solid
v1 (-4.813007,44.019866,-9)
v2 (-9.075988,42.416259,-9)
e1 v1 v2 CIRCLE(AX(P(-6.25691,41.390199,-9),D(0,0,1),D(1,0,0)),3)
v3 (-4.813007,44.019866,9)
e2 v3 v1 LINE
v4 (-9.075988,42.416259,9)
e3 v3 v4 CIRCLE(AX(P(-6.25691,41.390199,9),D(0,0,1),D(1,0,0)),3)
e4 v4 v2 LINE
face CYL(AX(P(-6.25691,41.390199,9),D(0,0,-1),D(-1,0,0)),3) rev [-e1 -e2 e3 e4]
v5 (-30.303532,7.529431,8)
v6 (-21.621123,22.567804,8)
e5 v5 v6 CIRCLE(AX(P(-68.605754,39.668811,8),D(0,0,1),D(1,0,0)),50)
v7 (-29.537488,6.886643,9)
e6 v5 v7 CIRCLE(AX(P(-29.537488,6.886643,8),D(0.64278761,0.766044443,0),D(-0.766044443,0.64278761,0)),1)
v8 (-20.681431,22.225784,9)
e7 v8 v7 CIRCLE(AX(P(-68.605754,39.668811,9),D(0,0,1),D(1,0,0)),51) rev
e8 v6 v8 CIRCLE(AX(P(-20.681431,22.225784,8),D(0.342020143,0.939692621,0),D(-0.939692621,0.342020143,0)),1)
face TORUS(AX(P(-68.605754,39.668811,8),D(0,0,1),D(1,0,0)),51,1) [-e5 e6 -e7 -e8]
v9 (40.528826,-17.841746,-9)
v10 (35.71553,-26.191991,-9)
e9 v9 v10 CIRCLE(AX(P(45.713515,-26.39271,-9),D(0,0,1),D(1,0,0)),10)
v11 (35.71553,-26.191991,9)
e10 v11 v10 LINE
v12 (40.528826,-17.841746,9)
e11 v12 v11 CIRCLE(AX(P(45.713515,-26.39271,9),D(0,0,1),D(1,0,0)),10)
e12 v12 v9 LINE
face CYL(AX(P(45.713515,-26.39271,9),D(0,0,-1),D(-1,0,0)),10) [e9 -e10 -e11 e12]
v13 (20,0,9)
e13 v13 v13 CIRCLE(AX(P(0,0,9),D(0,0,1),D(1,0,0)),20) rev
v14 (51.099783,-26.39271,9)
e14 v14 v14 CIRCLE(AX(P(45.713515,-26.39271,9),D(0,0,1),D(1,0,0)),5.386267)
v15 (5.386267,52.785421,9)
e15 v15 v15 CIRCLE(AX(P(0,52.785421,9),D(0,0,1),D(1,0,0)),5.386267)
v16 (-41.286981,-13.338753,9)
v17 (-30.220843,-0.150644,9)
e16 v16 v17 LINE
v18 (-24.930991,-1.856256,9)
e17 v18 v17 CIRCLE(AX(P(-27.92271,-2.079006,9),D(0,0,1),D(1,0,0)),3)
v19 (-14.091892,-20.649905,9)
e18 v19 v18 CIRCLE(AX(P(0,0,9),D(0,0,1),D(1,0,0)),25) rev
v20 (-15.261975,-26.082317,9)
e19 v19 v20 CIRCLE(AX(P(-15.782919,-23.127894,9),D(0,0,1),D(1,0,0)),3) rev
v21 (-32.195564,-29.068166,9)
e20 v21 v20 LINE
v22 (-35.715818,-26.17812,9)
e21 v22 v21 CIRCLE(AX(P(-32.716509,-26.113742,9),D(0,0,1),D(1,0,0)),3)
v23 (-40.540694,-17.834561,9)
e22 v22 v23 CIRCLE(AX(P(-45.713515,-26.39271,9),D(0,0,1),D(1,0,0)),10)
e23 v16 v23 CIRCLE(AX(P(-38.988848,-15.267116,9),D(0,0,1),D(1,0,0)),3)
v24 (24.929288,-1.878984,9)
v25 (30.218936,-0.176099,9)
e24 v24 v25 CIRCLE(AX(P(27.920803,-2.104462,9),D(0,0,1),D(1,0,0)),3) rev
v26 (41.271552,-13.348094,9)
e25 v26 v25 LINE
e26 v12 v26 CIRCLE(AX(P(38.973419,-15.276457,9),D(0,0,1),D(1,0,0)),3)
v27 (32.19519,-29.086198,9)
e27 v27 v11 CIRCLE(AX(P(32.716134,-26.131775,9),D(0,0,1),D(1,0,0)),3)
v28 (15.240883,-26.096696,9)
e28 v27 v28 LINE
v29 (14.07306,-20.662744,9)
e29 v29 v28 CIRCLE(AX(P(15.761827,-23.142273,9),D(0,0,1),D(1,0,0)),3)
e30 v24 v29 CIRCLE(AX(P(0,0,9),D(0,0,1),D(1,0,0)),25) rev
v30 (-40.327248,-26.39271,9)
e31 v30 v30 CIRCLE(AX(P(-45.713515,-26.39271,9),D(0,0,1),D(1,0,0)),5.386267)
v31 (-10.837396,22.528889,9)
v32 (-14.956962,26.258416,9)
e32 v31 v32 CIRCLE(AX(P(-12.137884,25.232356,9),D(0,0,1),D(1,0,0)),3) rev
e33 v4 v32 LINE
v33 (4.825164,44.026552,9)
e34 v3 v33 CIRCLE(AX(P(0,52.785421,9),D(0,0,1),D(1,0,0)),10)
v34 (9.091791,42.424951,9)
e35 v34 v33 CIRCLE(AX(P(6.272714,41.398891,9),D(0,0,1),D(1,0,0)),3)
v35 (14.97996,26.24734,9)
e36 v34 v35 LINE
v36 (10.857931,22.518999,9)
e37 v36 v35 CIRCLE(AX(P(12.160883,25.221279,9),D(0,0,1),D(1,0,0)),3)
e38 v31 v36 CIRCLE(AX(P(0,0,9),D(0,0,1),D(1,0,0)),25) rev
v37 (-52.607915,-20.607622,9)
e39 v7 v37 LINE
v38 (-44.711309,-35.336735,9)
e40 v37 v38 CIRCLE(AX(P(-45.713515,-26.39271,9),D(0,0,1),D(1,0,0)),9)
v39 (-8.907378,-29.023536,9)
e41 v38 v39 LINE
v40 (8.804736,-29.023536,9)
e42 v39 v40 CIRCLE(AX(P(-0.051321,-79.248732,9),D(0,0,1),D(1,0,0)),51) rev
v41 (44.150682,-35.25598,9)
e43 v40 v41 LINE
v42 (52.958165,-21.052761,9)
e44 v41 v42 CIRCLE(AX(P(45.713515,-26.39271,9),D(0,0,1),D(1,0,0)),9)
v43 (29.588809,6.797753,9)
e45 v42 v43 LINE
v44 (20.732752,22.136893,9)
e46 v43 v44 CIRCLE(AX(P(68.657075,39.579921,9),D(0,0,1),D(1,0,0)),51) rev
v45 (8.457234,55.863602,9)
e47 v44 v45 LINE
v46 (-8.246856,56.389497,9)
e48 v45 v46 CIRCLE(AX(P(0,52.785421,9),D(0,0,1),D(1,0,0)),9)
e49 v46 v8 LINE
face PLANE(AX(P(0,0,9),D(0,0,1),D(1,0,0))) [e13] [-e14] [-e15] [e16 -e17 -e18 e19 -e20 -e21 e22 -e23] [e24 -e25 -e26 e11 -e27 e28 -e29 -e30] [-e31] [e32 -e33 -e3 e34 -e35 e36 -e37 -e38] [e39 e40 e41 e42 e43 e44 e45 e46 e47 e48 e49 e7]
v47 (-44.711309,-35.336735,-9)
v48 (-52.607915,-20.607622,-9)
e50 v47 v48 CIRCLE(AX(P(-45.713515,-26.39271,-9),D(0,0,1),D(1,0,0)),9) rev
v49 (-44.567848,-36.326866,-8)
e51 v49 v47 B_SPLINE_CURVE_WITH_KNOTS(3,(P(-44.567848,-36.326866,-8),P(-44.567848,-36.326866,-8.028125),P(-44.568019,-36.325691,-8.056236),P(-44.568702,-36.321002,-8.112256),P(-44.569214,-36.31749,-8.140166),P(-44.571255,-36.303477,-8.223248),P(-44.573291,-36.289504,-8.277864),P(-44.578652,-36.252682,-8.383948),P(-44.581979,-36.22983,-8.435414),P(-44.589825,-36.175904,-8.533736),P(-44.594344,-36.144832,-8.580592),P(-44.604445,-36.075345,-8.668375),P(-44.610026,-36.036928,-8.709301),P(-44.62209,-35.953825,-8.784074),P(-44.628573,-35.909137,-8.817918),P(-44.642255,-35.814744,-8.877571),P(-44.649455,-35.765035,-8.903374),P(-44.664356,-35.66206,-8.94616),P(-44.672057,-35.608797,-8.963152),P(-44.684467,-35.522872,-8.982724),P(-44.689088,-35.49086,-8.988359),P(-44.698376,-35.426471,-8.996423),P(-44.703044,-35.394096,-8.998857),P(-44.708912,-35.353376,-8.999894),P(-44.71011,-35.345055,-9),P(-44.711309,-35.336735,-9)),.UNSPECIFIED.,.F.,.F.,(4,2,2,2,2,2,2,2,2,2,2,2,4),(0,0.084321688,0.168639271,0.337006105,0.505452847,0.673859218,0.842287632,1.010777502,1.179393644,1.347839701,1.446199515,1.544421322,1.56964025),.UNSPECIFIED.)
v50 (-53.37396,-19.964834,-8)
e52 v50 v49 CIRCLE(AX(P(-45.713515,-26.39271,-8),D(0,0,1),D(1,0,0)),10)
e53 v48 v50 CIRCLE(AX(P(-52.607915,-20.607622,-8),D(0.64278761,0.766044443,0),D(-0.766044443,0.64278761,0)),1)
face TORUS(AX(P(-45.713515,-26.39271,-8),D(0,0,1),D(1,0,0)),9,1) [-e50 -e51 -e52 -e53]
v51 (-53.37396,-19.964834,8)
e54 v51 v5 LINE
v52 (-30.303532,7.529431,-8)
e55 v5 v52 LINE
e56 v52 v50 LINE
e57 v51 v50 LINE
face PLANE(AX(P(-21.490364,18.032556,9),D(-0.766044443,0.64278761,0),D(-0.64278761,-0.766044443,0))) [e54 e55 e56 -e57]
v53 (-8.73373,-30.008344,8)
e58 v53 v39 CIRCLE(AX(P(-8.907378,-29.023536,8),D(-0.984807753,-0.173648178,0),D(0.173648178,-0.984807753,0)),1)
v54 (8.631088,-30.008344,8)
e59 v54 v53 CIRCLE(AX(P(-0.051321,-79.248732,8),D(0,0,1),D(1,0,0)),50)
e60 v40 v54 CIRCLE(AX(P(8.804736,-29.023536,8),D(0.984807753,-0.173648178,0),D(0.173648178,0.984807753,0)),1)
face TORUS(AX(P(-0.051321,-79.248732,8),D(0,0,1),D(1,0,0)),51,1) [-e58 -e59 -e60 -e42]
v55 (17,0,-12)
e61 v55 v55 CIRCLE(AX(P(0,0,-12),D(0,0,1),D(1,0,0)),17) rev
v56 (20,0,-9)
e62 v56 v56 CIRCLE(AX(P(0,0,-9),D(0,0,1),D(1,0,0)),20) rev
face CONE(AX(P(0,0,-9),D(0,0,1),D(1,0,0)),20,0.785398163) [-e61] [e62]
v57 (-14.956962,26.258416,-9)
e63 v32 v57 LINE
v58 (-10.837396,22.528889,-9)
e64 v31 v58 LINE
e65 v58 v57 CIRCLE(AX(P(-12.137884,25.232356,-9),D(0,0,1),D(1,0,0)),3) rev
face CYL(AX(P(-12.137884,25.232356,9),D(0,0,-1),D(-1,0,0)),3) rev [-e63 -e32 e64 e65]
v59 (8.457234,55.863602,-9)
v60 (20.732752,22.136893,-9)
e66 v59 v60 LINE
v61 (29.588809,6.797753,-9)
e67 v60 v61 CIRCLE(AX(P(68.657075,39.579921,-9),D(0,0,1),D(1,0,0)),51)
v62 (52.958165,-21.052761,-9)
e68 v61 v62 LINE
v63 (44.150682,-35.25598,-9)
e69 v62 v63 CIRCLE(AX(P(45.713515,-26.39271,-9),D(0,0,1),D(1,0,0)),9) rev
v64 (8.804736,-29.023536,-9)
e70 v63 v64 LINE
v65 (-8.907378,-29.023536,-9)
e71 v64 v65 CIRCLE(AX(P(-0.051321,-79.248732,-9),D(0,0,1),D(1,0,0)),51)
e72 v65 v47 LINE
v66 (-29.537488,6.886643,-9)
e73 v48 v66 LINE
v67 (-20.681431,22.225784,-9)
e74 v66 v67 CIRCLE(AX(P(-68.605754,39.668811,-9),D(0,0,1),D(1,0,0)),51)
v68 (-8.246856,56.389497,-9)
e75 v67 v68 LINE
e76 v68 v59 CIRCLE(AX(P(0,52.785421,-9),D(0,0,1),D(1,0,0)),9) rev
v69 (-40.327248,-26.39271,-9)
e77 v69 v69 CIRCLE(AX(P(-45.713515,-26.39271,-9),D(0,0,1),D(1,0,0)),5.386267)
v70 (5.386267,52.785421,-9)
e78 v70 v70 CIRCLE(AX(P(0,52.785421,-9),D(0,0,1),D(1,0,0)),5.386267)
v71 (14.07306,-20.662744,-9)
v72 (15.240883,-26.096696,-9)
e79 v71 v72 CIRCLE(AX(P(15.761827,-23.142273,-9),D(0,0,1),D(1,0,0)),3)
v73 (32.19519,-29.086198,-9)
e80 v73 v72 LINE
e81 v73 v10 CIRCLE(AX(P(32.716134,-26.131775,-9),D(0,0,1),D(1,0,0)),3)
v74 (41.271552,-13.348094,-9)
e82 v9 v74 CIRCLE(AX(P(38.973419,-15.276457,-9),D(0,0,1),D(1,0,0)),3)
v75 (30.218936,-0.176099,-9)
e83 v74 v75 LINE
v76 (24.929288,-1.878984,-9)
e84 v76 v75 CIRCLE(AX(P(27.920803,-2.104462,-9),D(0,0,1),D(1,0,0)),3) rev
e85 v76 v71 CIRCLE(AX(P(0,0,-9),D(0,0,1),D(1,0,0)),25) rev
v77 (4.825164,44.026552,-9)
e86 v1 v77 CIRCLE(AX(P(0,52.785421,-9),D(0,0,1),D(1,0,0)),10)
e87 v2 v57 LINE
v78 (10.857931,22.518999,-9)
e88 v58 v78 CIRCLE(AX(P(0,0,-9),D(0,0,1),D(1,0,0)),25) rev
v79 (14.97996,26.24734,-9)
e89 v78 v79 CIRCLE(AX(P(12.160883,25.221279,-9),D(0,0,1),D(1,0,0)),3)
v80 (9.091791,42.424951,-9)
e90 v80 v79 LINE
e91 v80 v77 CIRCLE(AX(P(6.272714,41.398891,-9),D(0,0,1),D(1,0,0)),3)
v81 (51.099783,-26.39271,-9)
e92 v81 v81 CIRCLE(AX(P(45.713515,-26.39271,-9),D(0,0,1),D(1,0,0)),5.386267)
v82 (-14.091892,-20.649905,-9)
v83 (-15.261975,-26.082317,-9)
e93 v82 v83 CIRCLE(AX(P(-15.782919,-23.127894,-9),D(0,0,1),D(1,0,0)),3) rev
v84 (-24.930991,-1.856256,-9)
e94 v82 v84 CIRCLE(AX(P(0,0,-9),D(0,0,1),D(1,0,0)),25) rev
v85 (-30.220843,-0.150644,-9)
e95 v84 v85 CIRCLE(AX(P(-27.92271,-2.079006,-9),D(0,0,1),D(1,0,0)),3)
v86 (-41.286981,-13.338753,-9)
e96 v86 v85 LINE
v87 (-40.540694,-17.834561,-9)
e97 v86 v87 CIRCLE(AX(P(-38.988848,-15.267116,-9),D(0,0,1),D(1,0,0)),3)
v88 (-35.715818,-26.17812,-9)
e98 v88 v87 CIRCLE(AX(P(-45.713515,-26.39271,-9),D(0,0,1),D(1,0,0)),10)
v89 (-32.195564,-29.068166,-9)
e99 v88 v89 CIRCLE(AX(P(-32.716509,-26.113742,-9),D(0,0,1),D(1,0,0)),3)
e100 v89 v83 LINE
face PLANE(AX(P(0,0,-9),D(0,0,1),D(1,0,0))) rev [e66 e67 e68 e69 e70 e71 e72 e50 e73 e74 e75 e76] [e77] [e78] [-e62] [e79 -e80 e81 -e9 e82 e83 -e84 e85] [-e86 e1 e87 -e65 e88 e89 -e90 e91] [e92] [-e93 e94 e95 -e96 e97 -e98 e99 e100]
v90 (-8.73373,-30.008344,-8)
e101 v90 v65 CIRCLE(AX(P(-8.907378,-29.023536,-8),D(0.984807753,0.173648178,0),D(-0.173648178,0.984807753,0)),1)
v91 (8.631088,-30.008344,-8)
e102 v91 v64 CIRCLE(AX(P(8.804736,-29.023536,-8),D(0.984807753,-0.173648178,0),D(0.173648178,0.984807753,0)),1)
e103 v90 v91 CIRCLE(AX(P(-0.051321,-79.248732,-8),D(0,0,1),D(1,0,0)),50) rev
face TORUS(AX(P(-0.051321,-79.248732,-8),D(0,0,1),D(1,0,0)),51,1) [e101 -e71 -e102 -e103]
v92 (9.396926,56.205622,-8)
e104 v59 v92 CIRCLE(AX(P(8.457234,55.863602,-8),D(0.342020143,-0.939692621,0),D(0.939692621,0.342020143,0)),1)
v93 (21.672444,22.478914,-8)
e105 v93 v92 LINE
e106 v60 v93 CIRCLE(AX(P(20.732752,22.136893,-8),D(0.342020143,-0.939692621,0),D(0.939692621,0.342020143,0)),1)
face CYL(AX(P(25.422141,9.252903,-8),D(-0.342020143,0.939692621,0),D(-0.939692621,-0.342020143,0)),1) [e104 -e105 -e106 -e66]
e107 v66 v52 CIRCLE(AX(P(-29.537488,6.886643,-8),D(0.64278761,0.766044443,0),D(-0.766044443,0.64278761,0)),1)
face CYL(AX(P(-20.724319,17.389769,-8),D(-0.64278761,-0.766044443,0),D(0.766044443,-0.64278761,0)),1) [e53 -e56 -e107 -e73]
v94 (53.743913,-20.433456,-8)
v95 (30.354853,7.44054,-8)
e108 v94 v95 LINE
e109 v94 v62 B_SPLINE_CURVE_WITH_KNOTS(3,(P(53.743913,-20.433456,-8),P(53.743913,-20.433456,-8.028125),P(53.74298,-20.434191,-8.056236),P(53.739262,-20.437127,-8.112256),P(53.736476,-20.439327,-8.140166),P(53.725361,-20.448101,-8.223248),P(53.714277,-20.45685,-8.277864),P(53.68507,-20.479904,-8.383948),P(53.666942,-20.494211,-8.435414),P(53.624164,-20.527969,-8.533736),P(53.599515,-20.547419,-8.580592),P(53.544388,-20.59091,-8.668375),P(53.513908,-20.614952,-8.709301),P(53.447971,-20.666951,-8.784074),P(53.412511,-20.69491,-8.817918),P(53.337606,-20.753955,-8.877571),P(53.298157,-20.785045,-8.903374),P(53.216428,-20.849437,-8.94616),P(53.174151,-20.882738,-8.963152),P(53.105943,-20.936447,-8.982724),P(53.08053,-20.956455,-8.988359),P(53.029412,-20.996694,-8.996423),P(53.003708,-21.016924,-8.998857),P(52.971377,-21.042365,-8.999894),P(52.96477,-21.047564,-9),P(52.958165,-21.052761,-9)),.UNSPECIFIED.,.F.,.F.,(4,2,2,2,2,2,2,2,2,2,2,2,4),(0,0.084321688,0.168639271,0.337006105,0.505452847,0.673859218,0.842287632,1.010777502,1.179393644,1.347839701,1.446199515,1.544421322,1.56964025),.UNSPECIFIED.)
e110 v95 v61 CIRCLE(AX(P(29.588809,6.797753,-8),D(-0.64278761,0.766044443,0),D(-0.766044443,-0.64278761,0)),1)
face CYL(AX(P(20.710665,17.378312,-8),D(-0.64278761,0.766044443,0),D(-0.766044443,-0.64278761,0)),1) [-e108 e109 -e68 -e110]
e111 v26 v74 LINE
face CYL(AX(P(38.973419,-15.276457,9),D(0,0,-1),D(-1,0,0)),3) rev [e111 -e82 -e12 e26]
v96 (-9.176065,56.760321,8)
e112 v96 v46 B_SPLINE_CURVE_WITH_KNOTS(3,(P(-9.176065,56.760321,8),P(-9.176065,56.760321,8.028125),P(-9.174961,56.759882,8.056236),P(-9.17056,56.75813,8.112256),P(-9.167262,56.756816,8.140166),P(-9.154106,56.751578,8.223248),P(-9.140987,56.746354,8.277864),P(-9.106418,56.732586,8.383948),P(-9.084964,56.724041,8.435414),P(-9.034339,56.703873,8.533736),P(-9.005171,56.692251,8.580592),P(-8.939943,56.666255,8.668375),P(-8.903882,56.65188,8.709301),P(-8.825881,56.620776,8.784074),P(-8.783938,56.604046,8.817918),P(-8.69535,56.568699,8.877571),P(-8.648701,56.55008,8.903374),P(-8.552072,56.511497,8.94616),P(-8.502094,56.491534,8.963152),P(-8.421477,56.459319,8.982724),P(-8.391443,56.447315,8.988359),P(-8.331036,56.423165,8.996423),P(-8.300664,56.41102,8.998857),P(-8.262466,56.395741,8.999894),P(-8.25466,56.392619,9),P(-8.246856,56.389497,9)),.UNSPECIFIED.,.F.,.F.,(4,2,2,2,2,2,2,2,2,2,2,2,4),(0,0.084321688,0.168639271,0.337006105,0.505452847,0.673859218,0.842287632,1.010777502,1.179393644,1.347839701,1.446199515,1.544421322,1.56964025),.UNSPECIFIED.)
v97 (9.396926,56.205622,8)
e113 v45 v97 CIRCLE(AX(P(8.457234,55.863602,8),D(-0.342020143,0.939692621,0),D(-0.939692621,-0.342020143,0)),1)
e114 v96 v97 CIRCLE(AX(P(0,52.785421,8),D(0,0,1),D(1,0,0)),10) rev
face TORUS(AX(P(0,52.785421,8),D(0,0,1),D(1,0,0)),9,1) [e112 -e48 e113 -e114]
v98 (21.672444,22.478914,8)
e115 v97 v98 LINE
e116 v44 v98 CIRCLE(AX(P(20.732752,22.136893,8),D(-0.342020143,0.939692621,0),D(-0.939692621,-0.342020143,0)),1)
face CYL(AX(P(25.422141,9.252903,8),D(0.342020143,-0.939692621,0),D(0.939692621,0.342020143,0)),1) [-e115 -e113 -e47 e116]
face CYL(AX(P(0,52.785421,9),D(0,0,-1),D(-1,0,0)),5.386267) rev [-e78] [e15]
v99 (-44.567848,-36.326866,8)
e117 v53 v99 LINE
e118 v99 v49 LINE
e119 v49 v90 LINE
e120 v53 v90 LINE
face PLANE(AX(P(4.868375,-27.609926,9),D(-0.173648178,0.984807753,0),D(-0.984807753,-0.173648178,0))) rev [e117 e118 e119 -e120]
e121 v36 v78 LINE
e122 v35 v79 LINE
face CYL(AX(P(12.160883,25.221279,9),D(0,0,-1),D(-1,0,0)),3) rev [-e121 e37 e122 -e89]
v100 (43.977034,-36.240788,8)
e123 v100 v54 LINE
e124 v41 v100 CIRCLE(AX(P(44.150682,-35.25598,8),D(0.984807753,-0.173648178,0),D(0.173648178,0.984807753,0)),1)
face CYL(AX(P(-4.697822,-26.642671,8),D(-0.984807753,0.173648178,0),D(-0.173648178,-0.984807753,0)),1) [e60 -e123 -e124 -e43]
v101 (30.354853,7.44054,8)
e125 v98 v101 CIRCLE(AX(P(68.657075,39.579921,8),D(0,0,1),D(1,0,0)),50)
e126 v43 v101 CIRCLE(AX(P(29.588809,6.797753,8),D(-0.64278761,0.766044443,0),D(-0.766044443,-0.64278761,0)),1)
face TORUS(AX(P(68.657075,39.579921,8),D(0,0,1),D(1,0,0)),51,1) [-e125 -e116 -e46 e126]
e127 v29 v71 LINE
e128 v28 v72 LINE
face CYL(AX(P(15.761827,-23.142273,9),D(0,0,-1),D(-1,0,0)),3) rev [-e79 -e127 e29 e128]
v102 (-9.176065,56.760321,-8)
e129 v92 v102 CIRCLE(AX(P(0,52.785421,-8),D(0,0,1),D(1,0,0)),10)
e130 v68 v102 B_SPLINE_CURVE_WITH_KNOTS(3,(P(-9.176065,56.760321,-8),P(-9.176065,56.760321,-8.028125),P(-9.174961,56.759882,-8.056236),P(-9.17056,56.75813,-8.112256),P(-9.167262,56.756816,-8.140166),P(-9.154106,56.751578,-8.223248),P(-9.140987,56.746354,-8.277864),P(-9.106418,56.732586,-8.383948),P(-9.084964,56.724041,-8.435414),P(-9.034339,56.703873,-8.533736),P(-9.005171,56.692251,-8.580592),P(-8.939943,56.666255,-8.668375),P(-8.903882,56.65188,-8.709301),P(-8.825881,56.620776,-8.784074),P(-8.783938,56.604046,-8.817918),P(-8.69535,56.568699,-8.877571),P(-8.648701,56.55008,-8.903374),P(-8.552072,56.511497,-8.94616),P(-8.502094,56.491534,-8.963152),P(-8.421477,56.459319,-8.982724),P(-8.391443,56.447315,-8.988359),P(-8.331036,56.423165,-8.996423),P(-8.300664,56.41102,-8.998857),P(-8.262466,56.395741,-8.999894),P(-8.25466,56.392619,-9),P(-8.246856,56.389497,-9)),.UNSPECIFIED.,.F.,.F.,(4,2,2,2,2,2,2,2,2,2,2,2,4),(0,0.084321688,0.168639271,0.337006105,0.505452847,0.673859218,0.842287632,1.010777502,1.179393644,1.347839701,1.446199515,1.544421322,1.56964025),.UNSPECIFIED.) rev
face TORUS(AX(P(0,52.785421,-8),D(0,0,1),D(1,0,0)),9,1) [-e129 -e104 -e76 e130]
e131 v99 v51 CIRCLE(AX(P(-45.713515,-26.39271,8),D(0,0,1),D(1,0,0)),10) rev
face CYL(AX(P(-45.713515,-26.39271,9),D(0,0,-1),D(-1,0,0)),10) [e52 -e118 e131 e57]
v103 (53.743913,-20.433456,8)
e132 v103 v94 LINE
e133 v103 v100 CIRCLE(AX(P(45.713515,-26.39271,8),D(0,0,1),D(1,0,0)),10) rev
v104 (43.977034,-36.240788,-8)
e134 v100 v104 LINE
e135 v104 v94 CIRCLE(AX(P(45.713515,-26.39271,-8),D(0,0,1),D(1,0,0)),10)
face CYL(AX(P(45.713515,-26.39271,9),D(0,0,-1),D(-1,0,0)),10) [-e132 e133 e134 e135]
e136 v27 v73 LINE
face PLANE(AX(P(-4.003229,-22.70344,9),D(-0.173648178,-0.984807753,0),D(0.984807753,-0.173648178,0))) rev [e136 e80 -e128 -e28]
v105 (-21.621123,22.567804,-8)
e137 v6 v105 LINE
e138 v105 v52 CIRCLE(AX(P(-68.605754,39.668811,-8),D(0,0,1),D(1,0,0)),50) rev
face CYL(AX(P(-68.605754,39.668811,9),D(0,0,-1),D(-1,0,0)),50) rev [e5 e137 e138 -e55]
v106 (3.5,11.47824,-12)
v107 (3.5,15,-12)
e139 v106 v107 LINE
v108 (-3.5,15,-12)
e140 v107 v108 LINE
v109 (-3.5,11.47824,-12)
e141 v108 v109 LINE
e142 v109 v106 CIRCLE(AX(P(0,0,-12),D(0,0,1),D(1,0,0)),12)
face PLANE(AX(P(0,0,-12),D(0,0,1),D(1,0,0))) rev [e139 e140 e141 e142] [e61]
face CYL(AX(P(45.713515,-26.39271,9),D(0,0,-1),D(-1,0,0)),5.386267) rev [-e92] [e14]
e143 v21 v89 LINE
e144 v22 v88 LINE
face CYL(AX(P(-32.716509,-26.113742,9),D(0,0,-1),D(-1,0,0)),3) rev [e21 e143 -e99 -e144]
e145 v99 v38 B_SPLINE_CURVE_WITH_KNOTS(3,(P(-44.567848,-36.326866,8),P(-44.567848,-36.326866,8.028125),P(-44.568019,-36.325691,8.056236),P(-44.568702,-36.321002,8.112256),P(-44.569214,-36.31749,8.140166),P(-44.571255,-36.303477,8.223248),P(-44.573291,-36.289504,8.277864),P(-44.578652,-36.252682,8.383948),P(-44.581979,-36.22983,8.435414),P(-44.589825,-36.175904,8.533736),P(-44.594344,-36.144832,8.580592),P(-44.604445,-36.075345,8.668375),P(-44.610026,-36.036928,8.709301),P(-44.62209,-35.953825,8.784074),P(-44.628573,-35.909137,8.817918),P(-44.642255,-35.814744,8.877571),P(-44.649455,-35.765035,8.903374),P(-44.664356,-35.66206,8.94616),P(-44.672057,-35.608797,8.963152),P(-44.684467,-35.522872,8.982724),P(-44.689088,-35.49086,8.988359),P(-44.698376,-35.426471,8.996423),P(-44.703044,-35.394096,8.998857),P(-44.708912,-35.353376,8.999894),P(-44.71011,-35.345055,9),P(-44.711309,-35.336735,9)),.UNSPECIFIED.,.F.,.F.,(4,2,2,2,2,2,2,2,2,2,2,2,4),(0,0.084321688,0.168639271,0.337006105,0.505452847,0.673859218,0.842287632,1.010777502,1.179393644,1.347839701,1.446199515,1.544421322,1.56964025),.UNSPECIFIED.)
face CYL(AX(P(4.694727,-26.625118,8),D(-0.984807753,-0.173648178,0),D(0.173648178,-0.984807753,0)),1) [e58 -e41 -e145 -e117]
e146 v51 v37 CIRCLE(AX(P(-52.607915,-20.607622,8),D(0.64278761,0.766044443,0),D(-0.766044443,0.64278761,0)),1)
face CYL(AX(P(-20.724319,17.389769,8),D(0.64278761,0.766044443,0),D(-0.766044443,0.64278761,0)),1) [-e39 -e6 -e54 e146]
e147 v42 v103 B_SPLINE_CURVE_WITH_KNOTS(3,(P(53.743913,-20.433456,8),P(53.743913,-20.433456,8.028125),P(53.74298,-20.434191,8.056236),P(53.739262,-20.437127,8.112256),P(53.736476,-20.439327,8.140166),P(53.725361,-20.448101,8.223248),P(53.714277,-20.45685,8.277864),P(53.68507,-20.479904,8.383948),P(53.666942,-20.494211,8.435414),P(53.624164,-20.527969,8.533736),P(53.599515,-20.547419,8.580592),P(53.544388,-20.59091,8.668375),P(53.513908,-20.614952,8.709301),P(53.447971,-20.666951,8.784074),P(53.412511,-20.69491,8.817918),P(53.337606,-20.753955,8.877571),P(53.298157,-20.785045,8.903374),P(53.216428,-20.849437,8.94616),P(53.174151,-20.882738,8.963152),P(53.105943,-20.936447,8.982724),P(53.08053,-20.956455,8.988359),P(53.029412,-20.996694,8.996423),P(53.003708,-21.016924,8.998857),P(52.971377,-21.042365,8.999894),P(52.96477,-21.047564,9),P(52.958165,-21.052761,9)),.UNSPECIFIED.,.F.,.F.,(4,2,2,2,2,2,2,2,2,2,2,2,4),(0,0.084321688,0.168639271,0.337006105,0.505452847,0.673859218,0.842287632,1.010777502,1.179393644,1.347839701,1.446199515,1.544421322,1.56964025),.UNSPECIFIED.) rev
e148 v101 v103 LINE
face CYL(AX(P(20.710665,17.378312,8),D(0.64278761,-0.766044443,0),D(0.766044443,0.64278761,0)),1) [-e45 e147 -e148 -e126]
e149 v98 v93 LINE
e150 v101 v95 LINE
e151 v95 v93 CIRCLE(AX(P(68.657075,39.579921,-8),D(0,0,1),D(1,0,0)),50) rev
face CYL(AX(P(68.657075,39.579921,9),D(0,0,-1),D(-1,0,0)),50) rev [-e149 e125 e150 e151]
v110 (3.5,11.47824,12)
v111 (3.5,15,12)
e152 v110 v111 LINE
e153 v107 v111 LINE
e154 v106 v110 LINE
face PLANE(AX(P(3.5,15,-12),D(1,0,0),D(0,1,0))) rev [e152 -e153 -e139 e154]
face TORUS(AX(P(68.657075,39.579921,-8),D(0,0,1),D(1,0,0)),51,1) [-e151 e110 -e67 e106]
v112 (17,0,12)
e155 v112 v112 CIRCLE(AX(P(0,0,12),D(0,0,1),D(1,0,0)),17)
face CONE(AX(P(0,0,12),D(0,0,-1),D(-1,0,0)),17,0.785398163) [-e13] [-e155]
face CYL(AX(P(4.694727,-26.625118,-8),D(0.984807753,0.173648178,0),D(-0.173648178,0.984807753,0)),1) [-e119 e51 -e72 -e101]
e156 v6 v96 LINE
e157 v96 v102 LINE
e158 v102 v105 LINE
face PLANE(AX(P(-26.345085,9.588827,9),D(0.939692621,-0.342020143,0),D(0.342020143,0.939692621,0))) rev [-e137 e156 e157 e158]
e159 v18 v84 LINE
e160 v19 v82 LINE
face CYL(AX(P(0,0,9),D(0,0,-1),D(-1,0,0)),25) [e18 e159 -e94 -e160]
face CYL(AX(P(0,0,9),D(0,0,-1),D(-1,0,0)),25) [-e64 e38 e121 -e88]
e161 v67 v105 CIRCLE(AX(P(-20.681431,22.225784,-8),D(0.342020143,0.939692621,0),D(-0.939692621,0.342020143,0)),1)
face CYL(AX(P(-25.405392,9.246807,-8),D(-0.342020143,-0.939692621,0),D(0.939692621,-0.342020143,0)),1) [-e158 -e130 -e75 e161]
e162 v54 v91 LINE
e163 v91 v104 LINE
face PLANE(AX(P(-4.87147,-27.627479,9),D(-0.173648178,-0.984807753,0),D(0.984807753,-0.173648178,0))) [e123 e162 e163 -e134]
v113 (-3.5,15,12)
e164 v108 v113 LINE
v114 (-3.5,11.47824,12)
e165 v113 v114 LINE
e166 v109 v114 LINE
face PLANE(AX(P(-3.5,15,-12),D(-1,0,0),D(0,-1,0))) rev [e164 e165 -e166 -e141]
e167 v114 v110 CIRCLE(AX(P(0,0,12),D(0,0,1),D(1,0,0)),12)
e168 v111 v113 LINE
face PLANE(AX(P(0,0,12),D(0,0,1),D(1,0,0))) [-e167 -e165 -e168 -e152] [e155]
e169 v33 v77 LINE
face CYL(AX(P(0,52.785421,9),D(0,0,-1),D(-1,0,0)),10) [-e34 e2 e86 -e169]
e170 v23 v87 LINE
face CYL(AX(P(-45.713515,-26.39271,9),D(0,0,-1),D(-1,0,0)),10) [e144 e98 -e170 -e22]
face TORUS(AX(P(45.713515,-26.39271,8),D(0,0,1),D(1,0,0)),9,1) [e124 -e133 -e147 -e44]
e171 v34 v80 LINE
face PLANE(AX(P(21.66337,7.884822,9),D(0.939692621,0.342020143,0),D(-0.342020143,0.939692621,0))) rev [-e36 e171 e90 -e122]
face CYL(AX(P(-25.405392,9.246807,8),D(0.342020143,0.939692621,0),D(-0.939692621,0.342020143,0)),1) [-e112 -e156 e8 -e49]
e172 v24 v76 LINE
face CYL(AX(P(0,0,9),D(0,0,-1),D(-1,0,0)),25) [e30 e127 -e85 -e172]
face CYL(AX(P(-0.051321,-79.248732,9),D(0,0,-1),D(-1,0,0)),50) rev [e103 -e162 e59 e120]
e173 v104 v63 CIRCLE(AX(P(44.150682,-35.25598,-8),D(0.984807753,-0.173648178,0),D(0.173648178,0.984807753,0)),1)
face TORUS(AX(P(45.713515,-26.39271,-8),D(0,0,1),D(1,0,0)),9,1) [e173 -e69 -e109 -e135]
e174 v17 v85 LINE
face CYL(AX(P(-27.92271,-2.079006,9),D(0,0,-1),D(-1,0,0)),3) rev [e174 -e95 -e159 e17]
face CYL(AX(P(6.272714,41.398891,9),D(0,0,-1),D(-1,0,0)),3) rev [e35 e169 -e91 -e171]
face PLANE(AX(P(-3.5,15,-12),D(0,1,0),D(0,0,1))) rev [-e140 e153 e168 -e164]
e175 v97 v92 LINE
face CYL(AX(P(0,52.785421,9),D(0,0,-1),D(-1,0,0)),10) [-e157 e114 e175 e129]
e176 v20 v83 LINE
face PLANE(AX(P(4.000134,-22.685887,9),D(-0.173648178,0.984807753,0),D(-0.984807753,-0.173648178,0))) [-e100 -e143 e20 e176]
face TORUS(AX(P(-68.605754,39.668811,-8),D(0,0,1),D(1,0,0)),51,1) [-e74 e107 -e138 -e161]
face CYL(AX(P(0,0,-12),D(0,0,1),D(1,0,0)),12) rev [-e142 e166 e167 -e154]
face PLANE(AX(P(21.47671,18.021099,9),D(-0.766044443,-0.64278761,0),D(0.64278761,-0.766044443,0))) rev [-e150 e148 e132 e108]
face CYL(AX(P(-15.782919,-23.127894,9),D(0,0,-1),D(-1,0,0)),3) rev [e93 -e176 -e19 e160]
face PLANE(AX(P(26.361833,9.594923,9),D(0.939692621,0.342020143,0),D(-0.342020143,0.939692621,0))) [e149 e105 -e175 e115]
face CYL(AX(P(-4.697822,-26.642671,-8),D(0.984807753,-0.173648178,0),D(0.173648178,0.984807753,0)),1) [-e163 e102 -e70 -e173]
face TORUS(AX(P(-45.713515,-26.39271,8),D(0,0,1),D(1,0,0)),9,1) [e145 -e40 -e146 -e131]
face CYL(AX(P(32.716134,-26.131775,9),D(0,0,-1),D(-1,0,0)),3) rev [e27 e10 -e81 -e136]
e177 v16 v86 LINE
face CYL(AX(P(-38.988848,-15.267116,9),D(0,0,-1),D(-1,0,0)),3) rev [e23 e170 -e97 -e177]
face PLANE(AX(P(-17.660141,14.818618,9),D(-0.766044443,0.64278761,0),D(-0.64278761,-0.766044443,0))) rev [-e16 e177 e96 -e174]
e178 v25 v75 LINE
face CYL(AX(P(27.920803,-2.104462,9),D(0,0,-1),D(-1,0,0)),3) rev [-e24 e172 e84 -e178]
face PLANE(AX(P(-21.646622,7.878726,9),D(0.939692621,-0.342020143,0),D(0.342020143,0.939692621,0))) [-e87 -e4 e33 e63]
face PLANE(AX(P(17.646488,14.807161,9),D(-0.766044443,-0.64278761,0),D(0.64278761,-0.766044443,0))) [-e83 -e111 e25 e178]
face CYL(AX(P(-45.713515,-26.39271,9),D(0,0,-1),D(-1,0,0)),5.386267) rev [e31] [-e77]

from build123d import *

# Parameters (mm, degrees)
SKETCH_1_R               = 5.386267440115599
SKETCH_1_R_2             = 5.386267440115426
SKETCH_1_R_3             = 20
SKETCH_1_R_4             = 5.3862674401151445
EXTRUDE_1_DEPTH          = 9
SKETCH_1_3_R             = 20
EXTRUDE_2_DEPTH          = 12
CUT_EXTRUDE_1_DEPTH      = 85.79389650309288
CUT_EXTRUDE_1_DEPTH_BACK = 85.79389650309288
CHAMFER_1_SIZE           = 3
FILLET_7_R               = 1
FILLET_9_R               = 1


# Some blends are built 0.0001 mm under size
with BuildPart() as part:
    # 스케치1 → 보스-돌출1 (new, symmetric)
    # profile 1 of 2: a face of its own
    with BuildSketch(Plane.XY):
        with BuildLine():
            ThreePointArc((-30.30353233995049, 7.529430557445876), (-25.30448430667716, 14.66881104177321), (-21.621123456603517, 22.56780387549022))
            Line((-21.621123456603517, 22.56780387549022), (-9.176064809943858, 56.760321490976835))
            ThreePointArc((-9.176064809943858, 56.760321490976835), (0.29852591934797246, 62.780964033722356), (9.396926207859103, 56.20562234639382))
            Line((9.396926207859103, 56.20562234639382), (21.67244430875402, 22.47891355207783))
            ThreePointArc((21.67244430875402, 22.47891355207783), (25.355805158827664, 14.579920718360814), (30.354853192101004, 7.440540234033471))
            Line((30.354853192101004, 7.440540234033471), (53.7439127431297, -20.433455513304605))
            ThreePointArc((53.7439127431297, -20.433455513304605), (54.22064676760672, -31.649013046704578), (43.97703368356183, -36.240787986690655))
            Line((43.97703368356183, -36.240787986690655), (8.631088031196274, -30.00834410952336))
            ThreePointArc((8.631088031196274, -30.00834410952336), (-0.0513208521507147, -29.248731760133694), (-8.733729735497715, -30.008344109523378))
            Line((-8.733729735497715, -30.008344109523378), (-44.56784793318583, -36.32686597767225))
            ThreePointArc((-44.56784793318583, -36.32686597767225), (-54.51917268695475, -31.131950987017753), (-53.37395989142093, -19.964834359703186))
            Line((-53.37395989142093, -19.964834359703186), (-30.30353233995049, 7.529430557445876))
        make_face()
        with Locations((-45.7135154602312, -26.392710456568583)):
            Circle(SKETCH_1_R, mode=Mode.SUBTRACT)
        with Locations((45.71351546023121, -26.392710456568555)):
            Circle(SKETCH_1_R_2, mode=Mode.SUBTRACT)
        Circle(SKETCH_1_R_3, mode=Mode.SUBTRACT)
        with Locations((0, 52.78542091313719)):
            Circle(SKETCH_1_R_4, mode=Mode.SUBTRACT)
        with BuildLine():
            ThreePointArc((-24.93099104661169, -1.856255756561672), (-27.002088749126838, 0.7762442533106575), (-30.22084330156199, -0.1506436182894203))
            Line((-30.22084330156199, -0.1506436182894203), (-41.28698133071818, -13.338753370678669))
            ThreePointArc((-41.28698133071818, -13.338753370678669), (-41.94835091243124, -15.758382440557112), (-40.54069433802355, -17.834561028237598))
            ThreePointArc((-40.54069433802355, -17.834561028237598), (-37.056732035085815, -21.386703991318203), (-35.71581818831214, -26.17811954561789))
            ThreePointArc((-35.71581818831214, -26.17811954561789), (-34.620101474352836, -28.43243494649932), (-32.19556447373562, -29.068165531369296))
            Line((-32.19556447373562, -29.068165531369296), (-15.261974751472668, -26.082316783086657))
            ThreePointArc((-15.261974751472668, -26.082316783086657), (-12.850176674158359, -23.759574441635834), (-14.091892218279895, -20.64990493218754))
            ThreePointArc((-14.091892218279895, -20.64990493218754), (-21.656330873683668, -12.49012942645256), (-24.93099104661169, -1.856255756561672))
        make_face(mode=Mode.SUBTRACT)
        with BuildLine():
            ThreePointArc((14.073060164409453, -20.662743709607216), (12.828797131654818, -23.77261693864109), (15.240882851137762, -26.096696213796697))
            Line((15.240882851137762, -26.096696213796697), (32.19518993918212, -29.086197992636468))
            ThreePointArc((32.19518993918212, -29.086197992636468), (34.6213349722887, -28.44914631675104), (35.71553008480945, -26.19199066966955))
            ThreePointArc((35.71553008480945, -26.19199066966955), (37.049794977242556, -21.39871932795785), (40.5288256439671, -17.841746095215687))
            ThreePointArc((40.5288256439671, -17.841746095215687), (41.93326169229327, -15.765669885135), (41.2715520284448, -13.34809395775018))
            Line((41.2715520284448, -13.34809395775018), (30.2189362994426, -0.1760994551487046))
            ThreePointArc((30.2189362994426, -0.1760994551487046), (27.001483386643283, 0.7512077778785407), (24.929288366147933, -1.8789841823288744))
            ThreePointArc((24.929288366147933, -1.8789841823288744), (21.644934816705337, -12.509867976144985), (14.073060164409453, -20.662743709607216))
        make_face(mode=Mode.SUBTRACT)
        with BuildLine():
            ThreePointArc((-4.813007455654948, 44.019865640833565), (-7.313160217940428, 44.19810483163431), (-9.075987554709165, 42.41625948911946))
            Line((-9.075987554709165, 42.41625948911946), (-14.95696154796992, 26.258416238235363))
            ThreePointArc((-14.95696154796992, 26.258416238235363), (-14.151306712484917, 23.008366663757286), (-10.837396147868024, 22.528889114516407))
            ThreePointArc((-10.837396147868024, 22.528889114516407), (0.01139605697825839, 24.999997402597582), (10.857930882202126, 22.51899946616905))
            ThreePointArc((10.857930882202126, 22.51899946616905), (14.17329161747192, 22.99637268533062), (14.979960450424109, 26.247339832086322))
            Line((14.979960450424109, 26.247339832086322), (9.091791391536077, 42.42495136331512))
            ThreePointArc((9.091791391536077, 42.42495136331512), (7.327015940142559, 44.20752875730815), (4.825164253214109, 44.02655169790714))
            ThreePointArc((4.825164253214109, 44.02655169790714), (0.00693705784330613, 42.785423319276056), (-4.813007455654948, 44.019865640833565))
        make_face(mode=Mode.SUBTRACT)
    # profile 2 of 2: a face of its own
    with BuildSketch(Plane.XY):
        Circle(SKETCH_1_R_3)
    extrude(amount=EXTRUDE_1_DEPTH, both=True)

    # 스케치1<3> → 보스-돌출2 (add, symmetric)
    with BuildSketch(Plane.XY):
        Circle(SKETCH_1_3_R)
    extrude(amount=EXTRUDE_2_DEPTH, both=True)

    # 스케치2 → 컷-돌출1 (cut, two sides: drawn at the far end of the back side and taken through both)
    with BuildSketch(Plane.XY.offset(-CUT_EXTRUDE_1_DEPTH_BACK)):
        with BuildLine():
            Line((-3.5000000000000018, 14.999999999999998), (3.4999999999999982, 14.999999999999998))
            Line((3.4999999999999982, 14.999999999999998), (3.4999999999999987, 11.478240283248999))
            ThreePointArc((3.4999999999999987, 11.478240283248999), (-2.2e-15, -12.000000000000004), (-3.5000000000000013, 11.478240283248999))
            Line((-3.5000000000000013, 11.478240283248999), (-3.5000000000000018, 14.999999999999998))
        make_face()
    extrude(amount=CUT_EXTRUDE_1_DEPTH + CUT_EXTRUDE_1_DEPTH_BACK, mode=Mode.SUBTRACT)

    # 모따기1
    chamfer_1_edges = [part.edges().sort_by_distance(p)[0] for p in [
        (-20, 2.45e-15, -12),
        (-20, 2.45e-15, 12),
    ]]
    chamfer(chamfer_1_edges, length=CHAMFER_1_SIZE - 0.0001)  # a hair under: the kernel refuses the full size

    # 필렛7
    # the kernel refuses this fillet: 1 mm, written as the material it takes off along each edge
    with BuildSketch(Plane(origin=(-21.621123456603517, 22.56780387549022, -9), x_dir=(0.9396926207859106, -0.34202014332566255, 0), z_dir=(0.34202014332566255, 0.9396926207859106, 0))) as fillet_7_piece_1:
        with BuildLine():
            CenterArc((FILLET_7_R, -FILLET_7_R), FILLET_7_R, 90, 90)
            Line((0, -FILLET_7_R), (-FILLET_7_R * 0.02, -FILLET_7_R))
            Line((-FILLET_7_R * 0.02, -FILLET_7_R), (-FILLET_7_R * 0.02, FILLET_7_R * 0.02))
            Line((-FILLET_7_R * 0.02, FILLET_7_R * 0.02), (FILLET_7_R, FILLET_7_R * 0.02))
            Line((FILLET_7_R, FILLET_7_R * 0.02), (FILLET_7_R, 0))
        make_face()
    extrude(amount=37.386917231391855, mode=Mode.SUBTRACT)
    with BuildSketch(Plane(origin=(8.9e-16, 52.78542091313719, -9), x_dir=(-0.952733181074785, 0.30380830416418975, 0), z_dir=(-0.30380830416418975, -0.952733181074785, 0))) as fillet_7_piece_2:
        with BuildLine():
            CenterArc((9.999999999999998 - FILLET_7_R, -FILLET_7_R), FILLET_7_R, 0, 90)
            Line((10, -FILLET_7_R), (9.999999999999998 + FILLET_7_R * 0.02, -FILLET_7_R))
            Line((9.999999999999998 + FILLET_7_R * 0.02, -FILLET_7_R), (9.999999999999998 + FILLET_7_R * 0.02, FILLET_7_R * 0.02))
            Line((9.999999999999998 + FILLET_7_R * 0.02, FILLET_7_R * 0.02), (9.999999999999998 - FILLET_7_R, FILLET_7_R * 0.02))
            Line((9.999999999999998 - FILLET_7_R, FILLET_7_R * 0.02), (9.999999999999998 - FILLET_7_R, 0))
        make_face()
    revolve(axis=Axis((8.9e-16, 52.78542091313719, -9), (0, 0, -1)), revolution_arc=142.31351700415118, mode=Mode.SUBTRACT)
    with BuildSketch(Plane(origin=(9.396926207859103, 56.20562234639382, -9), x_dir=(-0.9396926207859108, -0.3420201433256624, 0), z_dir=(0.3420201433256624, -0.9396926207859108, 0))) as fillet_7_piece_3:
        with BuildLine():
            CenterArc((FILLET_7_R, -FILLET_7_R), FILLET_7_R, 90, 90)
            Line((0, -FILLET_7_R), (-FILLET_7_R * 0.02, -FILLET_7_R))
            Line((-FILLET_7_R * 0.02, -FILLET_7_R), (-FILLET_7_R * 0.02, FILLET_7_R * 0.02))
            Line((-FILLET_7_R * 0.02, FILLET_7_R * 0.02), (FILLET_7_R, FILLET_7_R * 0.02))
            Line((FILLET_7_R, FILLET_7_R * 0.02), (FILLET_7_R, 0))
        make_face()
    extrude(amount=35.891213837678855, mode=Mode.SUBTRACT)
    with BuildSketch(Plane(origin=(68.65707534805, 39.57992071836101, -9), x_dir=(-0.9396926207859114, -0.3420201433256606, 0), z_dir=(-0.3420201433256606, 0.9396926207859114, 0))) as fillet_7_piece_4:
        with BuildLine():
            CenterArc((50.00000000000044 + FILLET_7_R, FILLET_7_R), FILLET_7_R, 180, 90)
            Line((50.00000000000044, FILLET_7_R), (50.00000000000044 - FILLET_7_R * 0.02, FILLET_7_R))
            Line((50.00000000000044 - FILLET_7_R * 0.02, FILLET_7_R), (50.00000000000044 - FILLET_7_R * 0.02, -FILLET_7_R * 0.02))
            Line((50.00000000000044 - FILLET_7_R * 0.02, -FILLET_7_R * 0.02), (50.00000000000044 + FILLET_7_R, -FILLET_7_R * 0.02))
            Line((50.00000000000044 + FILLET_7_R, -FILLET_7_R * 0.02), (50.00000000000044 + FILLET_7_R, 0))
        make_face()
    revolve(axis=Axis((68.65707534805, 39.57992071836101, -9), (0, 0, 1)), revolution_arc=20.000000000000934, mode=Mode.SUBTRACT)
    with BuildSketch(Plane(origin=(30.354853192101004, 7.440540234033471, -9), x_dir=(-0.7660444431189747, -0.6427876096865432, 0), z_dir=(0.6427876096865434, -0.7660444431189748, 0))) as fillet_7_piece_5:
        with BuildLine():
            CenterArc((FILLET_7_R, -FILLET_7_R), FILLET_7_R, 90, 90)
            Line((0, -FILLET_7_R), (-FILLET_7_R * 0.02, -FILLET_7_R))
            Line((-FILLET_7_R * 0.02, -FILLET_7_R), (-FILLET_7_R * 0.02, FILLET_7_R * 0.02))
            Line((-FILLET_7_R * 0.02, FILLET_7_R * 0.02), (FILLET_7_R, FILLET_7_R * 0.02))
            Line((FILLET_7_R, FILLET_7_R * 0.02), (FILLET_7_R, 0))
        make_face()
    extrude(amount=37.386917231392225, mode=Mode.SUBTRACT)
    with BuildSketch(Plane(origin=(45.71351546023114, -26.392710456568558, -9), x_dir=(0.7394722998242538, 0.673186985757025, 0), z_dir=(-0.673186985757025, 0.7394722998242538, 0))) as fillet_7_piece_6:
        with BuildLine():
            CenterArc((10.000000000000018 - FILLET_7_R, -FILLET_7_R), FILLET_7_R, 0, 90)
            Line((10.000000000000018, -FILLET_7_R), (10.000000000000018 + FILLET_7_R * 0.02, -FILLET_7_R))
            Line((10.000000000000018 + FILLET_7_R * 0.02, -FILLET_7_R), (10.000000000000018 + FILLET_7_R * 0.02, FILLET_7_R * 0.02))
            Line((10.000000000000018 + FILLET_7_R * 0.02, FILLET_7_R * 0.02), (10.000000000000018 - FILLET_7_R, FILLET_7_R * 0.02))
            Line((10.000000000000018 - FILLET_7_R, FILLET_7_R * 0.02), (10.000000000000018 - FILLET_7_R, 0))
        make_face()
    revolve(axis=Axis((45.71351546023114, -26.392710456568558, -9), (0, 0, -1)), revolution_arc=142.31351700415058, mode=Mode.SUBTRACT)
    with BuildSketch(Plane(origin=(43.97703368356183, -36.240787986690655, -9), x_dir=(0.17364817766693527, 0.9848077530122072, 0), z_dir=(-0.9848077530122072, 0.17364817766693527, 0))) as fillet_7_piece_7:
        with BuildLine():
            CenterArc((FILLET_7_R, -FILLET_7_R), FILLET_7_R, 90, 90)
            Line((0, -FILLET_7_R), (-FILLET_7_R * 0.02, -FILLET_7_R))
            Line((-FILLET_7_R * 0.02, -FILLET_7_R), (-FILLET_7_R * 0.02, FILLET_7_R * 0.02))
            Line((-FILLET_7_R * 0.02, FILLET_7_R * 0.02), (FILLET_7_R, FILLET_7_R * 0.02))
            Line((FILLET_7_R, FILLET_7_R * 0.02), (FILLET_7_R, 0))
        make_face()
    extrude(amount=35.89121383767927, mode=Mode.SUBTRACT)
    with BuildSketch(Plane(origin=(-0.05132085215066962, -79.24873176013405, -9), x_dir=(0.1736481776669377, 0.9848077530122067, 0), z_dir=(0.9848077530122067, -0.1736481776669377, 0))) as fillet_7_piece_8:
        with BuildLine():
            CenterArc((50.00000000000036 + FILLET_7_R, FILLET_7_R), FILLET_7_R, 180, 90)
            Line((50.00000000000036, FILLET_7_R), (50.00000000000036 - FILLET_7_R * 0.02, FILLET_7_R))
            Line((50.00000000000036 - FILLET_7_R * 0.02, FILLET_7_R), (50.00000000000036 - FILLET_7_R * 0.02, -FILLET_7_R * 0.02))
            Line((50.00000000000036 - FILLET_7_R * 0.02, -FILLET_7_R * 0.02), (50.00000000000036 + FILLET_7_R, -FILLET_7_R * 0.02))
            Line((50.00000000000036 + FILLET_7_R, -FILLET_7_R * 0.02), (50.00000000000036 + FILLET_7_R, 0))
        make_face()
    revolve(axis=Axis((-0.05132085215066962, -79.24873176013405, -9), (0, 0, 1)), revolution_arc=20.00000000000097, mode=Mode.SUBTRACT)
    with BuildSketch(Plane(origin=(-8.733729735497715, -30.008344109523378, -9), x_dir=(-0.17364817766693744, 0.9848077530122069, 0), z_dir=(-0.9848077530122069, -0.17364817766693744, 0))) as fillet_7_piece_9:
        with BuildLine():
            CenterArc((FILLET_7_R, -FILLET_7_R), FILLET_7_R, 90, 90)
            Line((0, -FILLET_7_R), (-FILLET_7_R * 0.02, -FILLET_7_R))
            Line((-FILLET_7_R * 0.02, -FILLET_7_R), (-FILLET_7_R * 0.02, FILLET_7_R * 0.02))
            Line((-FILLET_7_R * 0.02, FILLET_7_R * 0.02), (FILLET_7_R, FILLET_7_R * 0.02))
            Line((FILLET_7_R, FILLET_7_R * 0.02), (FILLET_7_R, 0))
        make_face()
    extrude(amount=37.38691723139181, mode=Mode.SUBTRACT)
    with BuildSketch(Plane(origin=(-45.713515460231235, -26.392710456568643, -9), x_dir=(0.21326088125054068, -0.9769952899212169, 0), z_dir=(0.9769952899212169, 0.21326088125054068, 0))) as fillet_7_piece_10:
        with BuildLine():
            CenterArc((9.999999999999979 - FILLET_7_R, -FILLET_7_R), FILLET_7_R, 0, 90)
            Line((9.999999999999973, -FILLET_7_R), (9.999999999999979 + FILLET_7_R * 0.02, -FILLET_7_R))
            Line((9.999999999999979 + FILLET_7_R * 0.02, -FILLET_7_R), (9.999999999999979 + FILLET_7_R * 0.02, FILLET_7_R * 0.02))
            Line((9.999999999999979 + FILLET_7_R * 0.02, FILLET_7_R * 0.02), (9.999999999999979 - FILLET_7_R, FILLET_7_R * 0.02))
            Line((9.999999999999979 - FILLET_7_R, FILLET_7_R * 0.02), (9.999999999999979 - FILLET_7_R, 0))
        make_face()
    revolve(axis=Axis((-45.713515460231235, -26.392710456568643, -9), (0, 0, -1)), revolution_arc=142.31351700415175, mode=Mode.SUBTRACT)
    with BuildSketch(Plane(origin=(-53.37395989142093, -19.964834359703186, -9), x_dir=(0.7660444431189748, -0.6427876096865431, 0), z_dir=(0.6427876096865432, 0.7660444431189749, 0))) as fillet_7_piece_11:
        with BuildLine():
            CenterArc((FILLET_7_R, -FILLET_7_R), FILLET_7_R, 90, 90)
            Line((0, -FILLET_7_R), (-FILLET_7_R * 0.02, -FILLET_7_R))
            Line((-FILLET_7_R * 0.02, -FILLET_7_R), (-FILLET_7_R * 0.02, FILLET_7_R * 0.02))
            Line((-FILLET_7_R * 0.02, FILLET_7_R * 0.02), (FILLET_7_R, FILLET_7_R * 0.02))
            Line((FILLET_7_R, FILLET_7_R * 0.02), (FILLET_7_R, 0))
        make_face()
    extrude(amount=35.89121383767928, mode=Mode.SUBTRACT)
    with BuildSketch(Plane(origin=(-68.60575449589972, 39.66881104177352, -9), x_dir=(0.766044443118974, -0.6427876096865442, 0), z_dir=(-0.6427876096865442, -0.766044443118974, 0))) as fillet_7_piece_12:
        with BuildLine():
            CenterArc((50.000000000000696 + FILLET_7_R, FILLET_7_R), FILLET_7_R, 180, 90)
            Line((50.000000000000696, FILLET_7_R), (50.000000000000696 - FILLET_7_R * 0.02, FILLET_7_R))
            Line((50.000000000000696 - FILLET_7_R * 0.02, FILLET_7_R), (50.000000000000696 - FILLET_7_R * 0.02, -FILLET_7_R * 0.02))
            Line((50.000000000000696 - FILLET_7_R * 0.02, -FILLET_7_R * 0.02), (50.000000000000696 + FILLET_7_R, -FILLET_7_R * 0.02))
            Line((50.000000000000696 + FILLET_7_R, -FILLET_7_R * 0.02), (50.000000000000696 + FILLET_7_R, 0))
        make_face()
    revolve(axis=Axis((-68.60575449589972, 39.66881104177352, -9), (0, 0, 1)), revolution_arc=20.00000000000081, mode=Mode.SUBTRACT)

    # 필렛9
    # the kernel refuses this fillet: 1 mm, written as the material it takes off along each edge
    with BuildSketch(Plane(origin=(-68.60575449589972, 39.66881104177352, 9), x_dir=(0.766044443118974, -0.6427876096865442, 0), z_dir=(-0.6427876096865442, -0.766044443118974, 0))) as fillet_9_piece_1:
        with BuildLine():
            CenterArc((50.000000000000696 + FILLET_9_R, -FILLET_9_R), FILLET_9_R, 90, 90)
            Line((50.000000000000696 + FILLET_9_R, 0), (50.000000000000696 + FILLET_9_R, FILLET_9_R * 0.02))
            Line((50.000000000000696 + FILLET_9_R, FILLET_9_R * 0.02), (50.000000000000696 - FILLET_9_R * 0.02, FILLET_9_R * 0.02))
            Line((50.000000000000696 - FILLET_9_R * 0.02, FILLET_9_R * 0.02), (50.000000000000696 - FILLET_9_R * 0.02, -FILLET_9_R))
            Line((50.000000000000696 - FILLET_9_R * 0.02, -FILLET_9_R), (50.000000000000696, -FILLET_9_R))
        make_face()
    revolve(axis=Axis((-68.60575449589972, 39.66881104177352, 9), (0, 0, 1)), revolution_arc=20.00000000000081, mode=Mode.SUBTRACT)
    with BuildSketch(Plane(origin=(-53.37395989142093, -19.964834359703186, 9), x_dir=(0, 0, -1), z_dir=(0.6427876096865432, 0.7660444431189749, 0))) as fillet_9_piece_2:
        with BuildLine():
            CenterArc((FILLET_9_R, -FILLET_9_R), FILLET_9_R, 90, 90)
            Line((0, -FILLET_9_R), (-FILLET_9_R * 0.02, -FILLET_9_R))
            Line((-FILLET_9_R * 0.02, -FILLET_9_R), (-FILLET_9_R * 0.02, FILLET_9_R * 0.02))
            Line((-FILLET_9_R * 0.02, FILLET_9_R * 0.02), (FILLET_9_R, FILLET_9_R * 0.02))
            Line((FILLET_9_R, FILLET_9_R * 0.02), (FILLET_9_R, 0))
        make_face()
    extrude(amount=35.89121383767928, mode=Mode.SUBTRACT)
    with BuildSketch(Plane(origin=(-45.713515460231235, -26.392710456568643, 9), x_dir=(0.21326088125054068, -0.9769952899212169, 0), z_dir=(0.9769952899212169, 0.21326088125054068, 0))) as fillet_9_piece_3:
        with BuildLine():
            CenterArc((9.999999999999979 - FILLET_9_R, FILLET_9_R), FILLET_9_R, 270.00000000000034, 89.99999999999966)
            Line((9.999999999999979 - FILLET_9_R, 0), (9.999999999999979 - FILLET_9_R, -FILLET_9_R * 0.02))
            Line((9.999999999999979 - FILLET_9_R, -FILLET_9_R * 0.02), (9.999999999999979 + FILLET_9_R * 0.02, -FILLET_9_R * 0.02))
            Line((9.999999999999979 + FILLET_9_R * 0.02, -FILLET_9_R * 0.02), (9.999999999999979 + FILLET_9_R * 0.02, FILLET_9_R))
            Line((9.999999999999979 + FILLET_9_R * 0.02, FILLET_9_R), (9.999999999999973, FILLET_9_R))
        make_face()
    revolve(axis=Axis((-45.713515460231235, -26.392710456568643, 9), (0, 0, -1)), revolution_arc=142.31351700415175, mode=Mode.SUBTRACT)
    with BuildSketch(Plane(origin=(-8.733729735497715, -30.008344109523378, 9), x_dir=(0, 0, -1), z_dir=(-0.9848077530122069, -0.17364817766693744, 0))) as fillet_9_piece_4:
        with BuildLine():
            CenterArc((FILLET_9_R, -FILLET_9_R), FILLET_9_R, 90, 90)
            Line((0, -FILLET_9_R), (-FILLET_9_R * 0.02, -FILLET_9_R))
            Line((-FILLET_9_R * 0.02, -FILLET_9_R), (-FILLET_9_R * 0.02, FILLET_9_R * 0.02))
            Line((-FILLET_9_R * 0.02, FILLET_9_R * 0.02), (FILLET_9_R, FILLET_9_R * 0.02))
            Line((FILLET_9_R, FILLET_9_R * 0.02), (FILLET_9_R, 0))
        make_face()
    extrude(amount=37.38691723139181, mode=Mode.SUBTRACT)
    with BuildSketch(Plane(origin=(-0.05132085215066962, -79.24873176013405, 9), x_dir=(0.1736481776669377, 0.9848077530122067, 0), z_dir=(0.9848077530122067, -0.1736481776669377, 0))) as fillet_9_piece_5:
        with BuildLine():
            CenterArc((50.00000000000036 + FILLET_9_R, -FILLET_9_R), FILLET_9_R, 90, 90)
            Line((50.00000000000036 + FILLET_9_R, 0), (50.00000000000036 + FILLET_9_R, FILLET_9_R * 0.02))
            Line((50.00000000000036 + FILLET_9_R, FILLET_9_R * 0.02), (50.00000000000036 - FILLET_9_R * 0.02, FILLET_9_R * 0.02))
            Line((50.00000000000036 - FILLET_9_R * 0.02, FILLET_9_R * 0.02), (50.00000000000036 - FILLET_9_R * 0.02, -FILLET_9_R))
            Line((50.00000000000036 - FILLET_9_R * 0.02, -FILLET_9_R), (50.00000000000036, -FILLET_9_R))
        make_face()
    revolve(axis=Axis((-0.05132085215066962, -79.24873176013405, 9), (0, 0, 1)), revolution_arc=20.00000000000097, mode=Mode.SUBTRACT)
    with BuildSketch(Plane(origin=(43.97703368356183, -36.240787986690655, 9), x_dir=(0, 0, -1), z_dir=(-0.9848077530122072, 0.17364817766693527, 0))) as fillet_9_piece_6:
        with BuildLine():
            CenterArc((FILLET_9_R, -FILLET_9_R), FILLET_9_R, 90, 90)
            Line((0, -FILLET_9_R), (-FILLET_9_R * 0.02, -FILLET_9_R))
            Line((-FILLET_9_R * 0.02, -FILLET_9_R), (-FILLET_9_R * 0.02, FILLET_9_R * 0.02))
            Line((-FILLET_9_R * 0.02, FILLET_9_R * 0.02), (FILLET_9_R, FILLET_9_R * 0.02))
            Line((FILLET_9_R, FILLET_9_R * 0.02), (FILLET_9_R, 0))
        make_face()
    extrude(amount=35.89121383767927, mode=Mode.SUBTRACT)
    with BuildSketch(Plane(origin=(45.71351546023114, -26.392710456568558, 9), x_dir=(0.7394722998242538, 0.673186985757025, 0), z_dir=(-0.673186985757025, 0.7394722998242538, 0))) as fillet_9_piece_7:
        with BuildLine():
            CenterArc((10.000000000000016 - FILLET_9_R, FILLET_9_R), FILLET_9_R, 269.9999999999998, 90.00000000000023)
            Line((10.000000000000016 - FILLET_9_R, 0), (10.000000000000016 - FILLET_9_R, -FILLET_9_R * 0.02))
            Line((10.000000000000016 - FILLET_9_R, -FILLET_9_R * 0.02), (10.000000000000016 + FILLET_9_R * 0.02, -FILLET_9_R * 0.02))
            Line((10.000000000000016 + FILLET_9_R * 0.02, -FILLET_9_R * 0.02), (10.000000000000016 + FILLET_9_R * 0.02, FILLET_9_R))
            Line((10.000000000000016 + FILLET_9_R * 0.02, FILLET_9_R), (10.000000000000018, FILLET_9_R))
        make_face()
    revolve(axis=Axis((45.71351546023114, -26.392710456568558, 9), (0, 0, -1)), revolution_arc=142.31351700415058, mode=Mode.SUBTRACT)
    with BuildSketch(Plane(origin=(30.354853192101004, 7.440540234033471, 9), x_dir=(0, 0, -1), z_dir=(0.6427876096865434, -0.7660444431189748, 0))) as fillet_9_piece_8:
        with BuildLine():
            CenterArc((FILLET_9_R, -FILLET_9_R), FILLET_9_R, 90, 90)
            Line((0, -FILLET_9_R), (-FILLET_9_R * 0.02, -FILLET_9_R))
            Line((-FILLET_9_R * 0.02, -FILLET_9_R), (-FILLET_9_R * 0.02, FILLET_9_R * 0.02))
            Line((-FILLET_9_R * 0.02, FILLET_9_R * 0.02), (FILLET_9_R, FILLET_9_R * 0.02))
            Line((FILLET_9_R, FILLET_9_R * 0.02), (FILLET_9_R, 0))
        make_face()
    extrude(amount=37.386917231392225, mode=Mode.SUBTRACT)
    with BuildSketch(Plane(origin=(68.65707534805, 39.57992071836101, 9), x_dir=(-0.9396926207859114, -0.3420201433256606, 0), z_dir=(-0.3420201433256606, 0.9396926207859114, 0))) as fillet_9_piece_9:
        with BuildLine():
            CenterArc((50.00000000000044 + FILLET_9_R, -FILLET_9_R), FILLET_9_R, 90, 90)
            Line((50.00000000000044 + FILLET_9_R, 0), (50.00000000000044 + FILLET_9_R, FILLET_9_R * 0.02))
            Line((50.00000000000044 + FILLET_9_R, FILLET_9_R * 0.02), (50.00000000000044 - FILLET_9_R * 0.02, FILLET_9_R * 0.02))
            Line((50.00000000000044 - FILLET_9_R * 0.02, FILLET_9_R * 0.02), (50.00000000000044 - FILLET_9_R * 0.02, -FILLET_9_R))
            Line((50.00000000000044 - FILLET_9_R * 0.02, -FILLET_9_R), (50.00000000000044, -FILLET_9_R))
        make_face()
    revolve(axis=Axis((68.65707534805, 39.57992071836101, 9), (0, 0, 1)), revolution_arc=20.000000000000934, mode=Mode.SUBTRACT)
    with BuildSketch(Plane(origin=(9.396926207859103, 56.20562234639382, 9), x_dir=(0, 0, -1), z_dir=(0.3420201433256624, -0.9396926207859108, 0))) as fillet_9_piece_10:
        with BuildLine():
            CenterArc((FILLET_9_R, -FILLET_9_R), FILLET_9_R, 90, 90)
            Line((0, -FILLET_9_R), (-FILLET_9_R * 0.02, -FILLET_9_R))
            Line((-FILLET_9_R * 0.02, -FILLET_9_R), (-FILLET_9_R * 0.02, FILLET_9_R * 0.02))
            Line((-FILLET_9_R * 0.02, FILLET_9_R * 0.02), (FILLET_9_R, FILLET_9_R * 0.02))
            Line((FILLET_9_R, FILLET_9_R * 0.02), (FILLET_9_R, 0))
        make_face()
    extrude(amount=35.891213837678855, mode=Mode.SUBTRACT)
    with BuildSketch(Plane(origin=(8.9e-16, 52.78542091313719, 9), x_dir=(-0.952733181074785, 0.30380830416418975, 0), z_dir=(-0.30380830416418975, -0.952733181074785, 0))) as fillet_9_piece_11:
        with BuildLine():
            CenterArc((9.999999999999998 - FILLET_9_R, FILLET_9_R), FILLET_9_R, 270, 90)
            Line((9.999999999999998 - FILLET_9_R, 0), (9.999999999999998 - FILLET_9_R, -FILLET_9_R * 0.02))
            Line((9.999999999999998 - FILLET_9_R, -FILLET_9_R * 0.02), (9.999999999999998 + FILLET_9_R * 0.02, -FILLET_9_R * 0.02))
            Line((9.999999999999998 + FILLET_9_R * 0.02, -FILLET_9_R * 0.02), (9.999999999999998 + FILLET_9_R * 0.02, FILLET_9_R))
            Line((9.999999999999998 + FILLET_9_R * 0.02, FILLET_9_R), (10, FILLET_9_R))
        make_face()
    revolve(axis=Axis((8.9e-16, 52.78542091313719, 9), (0, 0, -1)), revolution_arc=142.31351700415118, mode=Mode.SUBTRACT)
    with BuildSketch(Plane(origin=(-21.621123456603517, 22.56780387549022, 9), x_dir=(0, 0, -1), z_dir=(0.34202014332566255, 0.9396926207859106, 0))) as fillet_9_piece_12:
        with BuildLine():
            CenterArc((FILLET_9_R, -FILLET_9_R), FILLET_9_R, 90, 90)
            Line((0, -FILLET_9_R), (-FILLET_9_R * 0.02, -FILLET_9_R))
            Line((-FILLET_9_R * 0.02, -FILLET_9_R), (-FILLET_9_R * 0.02, FILLET_9_R * 0.02))
            Line((-FILLET_9_R * 0.02, FILLET_9_R * 0.02), (FILLET_9_R, FILLET_9_R * 0.02))
            Line((FILLET_9_R, FILLET_9_R * 0.02), (FILLET_9_R, 0))
        make_face()
    extrude(amount=37.386917231391855, mode=Mode.SUBTRACT)


solid = part.part
